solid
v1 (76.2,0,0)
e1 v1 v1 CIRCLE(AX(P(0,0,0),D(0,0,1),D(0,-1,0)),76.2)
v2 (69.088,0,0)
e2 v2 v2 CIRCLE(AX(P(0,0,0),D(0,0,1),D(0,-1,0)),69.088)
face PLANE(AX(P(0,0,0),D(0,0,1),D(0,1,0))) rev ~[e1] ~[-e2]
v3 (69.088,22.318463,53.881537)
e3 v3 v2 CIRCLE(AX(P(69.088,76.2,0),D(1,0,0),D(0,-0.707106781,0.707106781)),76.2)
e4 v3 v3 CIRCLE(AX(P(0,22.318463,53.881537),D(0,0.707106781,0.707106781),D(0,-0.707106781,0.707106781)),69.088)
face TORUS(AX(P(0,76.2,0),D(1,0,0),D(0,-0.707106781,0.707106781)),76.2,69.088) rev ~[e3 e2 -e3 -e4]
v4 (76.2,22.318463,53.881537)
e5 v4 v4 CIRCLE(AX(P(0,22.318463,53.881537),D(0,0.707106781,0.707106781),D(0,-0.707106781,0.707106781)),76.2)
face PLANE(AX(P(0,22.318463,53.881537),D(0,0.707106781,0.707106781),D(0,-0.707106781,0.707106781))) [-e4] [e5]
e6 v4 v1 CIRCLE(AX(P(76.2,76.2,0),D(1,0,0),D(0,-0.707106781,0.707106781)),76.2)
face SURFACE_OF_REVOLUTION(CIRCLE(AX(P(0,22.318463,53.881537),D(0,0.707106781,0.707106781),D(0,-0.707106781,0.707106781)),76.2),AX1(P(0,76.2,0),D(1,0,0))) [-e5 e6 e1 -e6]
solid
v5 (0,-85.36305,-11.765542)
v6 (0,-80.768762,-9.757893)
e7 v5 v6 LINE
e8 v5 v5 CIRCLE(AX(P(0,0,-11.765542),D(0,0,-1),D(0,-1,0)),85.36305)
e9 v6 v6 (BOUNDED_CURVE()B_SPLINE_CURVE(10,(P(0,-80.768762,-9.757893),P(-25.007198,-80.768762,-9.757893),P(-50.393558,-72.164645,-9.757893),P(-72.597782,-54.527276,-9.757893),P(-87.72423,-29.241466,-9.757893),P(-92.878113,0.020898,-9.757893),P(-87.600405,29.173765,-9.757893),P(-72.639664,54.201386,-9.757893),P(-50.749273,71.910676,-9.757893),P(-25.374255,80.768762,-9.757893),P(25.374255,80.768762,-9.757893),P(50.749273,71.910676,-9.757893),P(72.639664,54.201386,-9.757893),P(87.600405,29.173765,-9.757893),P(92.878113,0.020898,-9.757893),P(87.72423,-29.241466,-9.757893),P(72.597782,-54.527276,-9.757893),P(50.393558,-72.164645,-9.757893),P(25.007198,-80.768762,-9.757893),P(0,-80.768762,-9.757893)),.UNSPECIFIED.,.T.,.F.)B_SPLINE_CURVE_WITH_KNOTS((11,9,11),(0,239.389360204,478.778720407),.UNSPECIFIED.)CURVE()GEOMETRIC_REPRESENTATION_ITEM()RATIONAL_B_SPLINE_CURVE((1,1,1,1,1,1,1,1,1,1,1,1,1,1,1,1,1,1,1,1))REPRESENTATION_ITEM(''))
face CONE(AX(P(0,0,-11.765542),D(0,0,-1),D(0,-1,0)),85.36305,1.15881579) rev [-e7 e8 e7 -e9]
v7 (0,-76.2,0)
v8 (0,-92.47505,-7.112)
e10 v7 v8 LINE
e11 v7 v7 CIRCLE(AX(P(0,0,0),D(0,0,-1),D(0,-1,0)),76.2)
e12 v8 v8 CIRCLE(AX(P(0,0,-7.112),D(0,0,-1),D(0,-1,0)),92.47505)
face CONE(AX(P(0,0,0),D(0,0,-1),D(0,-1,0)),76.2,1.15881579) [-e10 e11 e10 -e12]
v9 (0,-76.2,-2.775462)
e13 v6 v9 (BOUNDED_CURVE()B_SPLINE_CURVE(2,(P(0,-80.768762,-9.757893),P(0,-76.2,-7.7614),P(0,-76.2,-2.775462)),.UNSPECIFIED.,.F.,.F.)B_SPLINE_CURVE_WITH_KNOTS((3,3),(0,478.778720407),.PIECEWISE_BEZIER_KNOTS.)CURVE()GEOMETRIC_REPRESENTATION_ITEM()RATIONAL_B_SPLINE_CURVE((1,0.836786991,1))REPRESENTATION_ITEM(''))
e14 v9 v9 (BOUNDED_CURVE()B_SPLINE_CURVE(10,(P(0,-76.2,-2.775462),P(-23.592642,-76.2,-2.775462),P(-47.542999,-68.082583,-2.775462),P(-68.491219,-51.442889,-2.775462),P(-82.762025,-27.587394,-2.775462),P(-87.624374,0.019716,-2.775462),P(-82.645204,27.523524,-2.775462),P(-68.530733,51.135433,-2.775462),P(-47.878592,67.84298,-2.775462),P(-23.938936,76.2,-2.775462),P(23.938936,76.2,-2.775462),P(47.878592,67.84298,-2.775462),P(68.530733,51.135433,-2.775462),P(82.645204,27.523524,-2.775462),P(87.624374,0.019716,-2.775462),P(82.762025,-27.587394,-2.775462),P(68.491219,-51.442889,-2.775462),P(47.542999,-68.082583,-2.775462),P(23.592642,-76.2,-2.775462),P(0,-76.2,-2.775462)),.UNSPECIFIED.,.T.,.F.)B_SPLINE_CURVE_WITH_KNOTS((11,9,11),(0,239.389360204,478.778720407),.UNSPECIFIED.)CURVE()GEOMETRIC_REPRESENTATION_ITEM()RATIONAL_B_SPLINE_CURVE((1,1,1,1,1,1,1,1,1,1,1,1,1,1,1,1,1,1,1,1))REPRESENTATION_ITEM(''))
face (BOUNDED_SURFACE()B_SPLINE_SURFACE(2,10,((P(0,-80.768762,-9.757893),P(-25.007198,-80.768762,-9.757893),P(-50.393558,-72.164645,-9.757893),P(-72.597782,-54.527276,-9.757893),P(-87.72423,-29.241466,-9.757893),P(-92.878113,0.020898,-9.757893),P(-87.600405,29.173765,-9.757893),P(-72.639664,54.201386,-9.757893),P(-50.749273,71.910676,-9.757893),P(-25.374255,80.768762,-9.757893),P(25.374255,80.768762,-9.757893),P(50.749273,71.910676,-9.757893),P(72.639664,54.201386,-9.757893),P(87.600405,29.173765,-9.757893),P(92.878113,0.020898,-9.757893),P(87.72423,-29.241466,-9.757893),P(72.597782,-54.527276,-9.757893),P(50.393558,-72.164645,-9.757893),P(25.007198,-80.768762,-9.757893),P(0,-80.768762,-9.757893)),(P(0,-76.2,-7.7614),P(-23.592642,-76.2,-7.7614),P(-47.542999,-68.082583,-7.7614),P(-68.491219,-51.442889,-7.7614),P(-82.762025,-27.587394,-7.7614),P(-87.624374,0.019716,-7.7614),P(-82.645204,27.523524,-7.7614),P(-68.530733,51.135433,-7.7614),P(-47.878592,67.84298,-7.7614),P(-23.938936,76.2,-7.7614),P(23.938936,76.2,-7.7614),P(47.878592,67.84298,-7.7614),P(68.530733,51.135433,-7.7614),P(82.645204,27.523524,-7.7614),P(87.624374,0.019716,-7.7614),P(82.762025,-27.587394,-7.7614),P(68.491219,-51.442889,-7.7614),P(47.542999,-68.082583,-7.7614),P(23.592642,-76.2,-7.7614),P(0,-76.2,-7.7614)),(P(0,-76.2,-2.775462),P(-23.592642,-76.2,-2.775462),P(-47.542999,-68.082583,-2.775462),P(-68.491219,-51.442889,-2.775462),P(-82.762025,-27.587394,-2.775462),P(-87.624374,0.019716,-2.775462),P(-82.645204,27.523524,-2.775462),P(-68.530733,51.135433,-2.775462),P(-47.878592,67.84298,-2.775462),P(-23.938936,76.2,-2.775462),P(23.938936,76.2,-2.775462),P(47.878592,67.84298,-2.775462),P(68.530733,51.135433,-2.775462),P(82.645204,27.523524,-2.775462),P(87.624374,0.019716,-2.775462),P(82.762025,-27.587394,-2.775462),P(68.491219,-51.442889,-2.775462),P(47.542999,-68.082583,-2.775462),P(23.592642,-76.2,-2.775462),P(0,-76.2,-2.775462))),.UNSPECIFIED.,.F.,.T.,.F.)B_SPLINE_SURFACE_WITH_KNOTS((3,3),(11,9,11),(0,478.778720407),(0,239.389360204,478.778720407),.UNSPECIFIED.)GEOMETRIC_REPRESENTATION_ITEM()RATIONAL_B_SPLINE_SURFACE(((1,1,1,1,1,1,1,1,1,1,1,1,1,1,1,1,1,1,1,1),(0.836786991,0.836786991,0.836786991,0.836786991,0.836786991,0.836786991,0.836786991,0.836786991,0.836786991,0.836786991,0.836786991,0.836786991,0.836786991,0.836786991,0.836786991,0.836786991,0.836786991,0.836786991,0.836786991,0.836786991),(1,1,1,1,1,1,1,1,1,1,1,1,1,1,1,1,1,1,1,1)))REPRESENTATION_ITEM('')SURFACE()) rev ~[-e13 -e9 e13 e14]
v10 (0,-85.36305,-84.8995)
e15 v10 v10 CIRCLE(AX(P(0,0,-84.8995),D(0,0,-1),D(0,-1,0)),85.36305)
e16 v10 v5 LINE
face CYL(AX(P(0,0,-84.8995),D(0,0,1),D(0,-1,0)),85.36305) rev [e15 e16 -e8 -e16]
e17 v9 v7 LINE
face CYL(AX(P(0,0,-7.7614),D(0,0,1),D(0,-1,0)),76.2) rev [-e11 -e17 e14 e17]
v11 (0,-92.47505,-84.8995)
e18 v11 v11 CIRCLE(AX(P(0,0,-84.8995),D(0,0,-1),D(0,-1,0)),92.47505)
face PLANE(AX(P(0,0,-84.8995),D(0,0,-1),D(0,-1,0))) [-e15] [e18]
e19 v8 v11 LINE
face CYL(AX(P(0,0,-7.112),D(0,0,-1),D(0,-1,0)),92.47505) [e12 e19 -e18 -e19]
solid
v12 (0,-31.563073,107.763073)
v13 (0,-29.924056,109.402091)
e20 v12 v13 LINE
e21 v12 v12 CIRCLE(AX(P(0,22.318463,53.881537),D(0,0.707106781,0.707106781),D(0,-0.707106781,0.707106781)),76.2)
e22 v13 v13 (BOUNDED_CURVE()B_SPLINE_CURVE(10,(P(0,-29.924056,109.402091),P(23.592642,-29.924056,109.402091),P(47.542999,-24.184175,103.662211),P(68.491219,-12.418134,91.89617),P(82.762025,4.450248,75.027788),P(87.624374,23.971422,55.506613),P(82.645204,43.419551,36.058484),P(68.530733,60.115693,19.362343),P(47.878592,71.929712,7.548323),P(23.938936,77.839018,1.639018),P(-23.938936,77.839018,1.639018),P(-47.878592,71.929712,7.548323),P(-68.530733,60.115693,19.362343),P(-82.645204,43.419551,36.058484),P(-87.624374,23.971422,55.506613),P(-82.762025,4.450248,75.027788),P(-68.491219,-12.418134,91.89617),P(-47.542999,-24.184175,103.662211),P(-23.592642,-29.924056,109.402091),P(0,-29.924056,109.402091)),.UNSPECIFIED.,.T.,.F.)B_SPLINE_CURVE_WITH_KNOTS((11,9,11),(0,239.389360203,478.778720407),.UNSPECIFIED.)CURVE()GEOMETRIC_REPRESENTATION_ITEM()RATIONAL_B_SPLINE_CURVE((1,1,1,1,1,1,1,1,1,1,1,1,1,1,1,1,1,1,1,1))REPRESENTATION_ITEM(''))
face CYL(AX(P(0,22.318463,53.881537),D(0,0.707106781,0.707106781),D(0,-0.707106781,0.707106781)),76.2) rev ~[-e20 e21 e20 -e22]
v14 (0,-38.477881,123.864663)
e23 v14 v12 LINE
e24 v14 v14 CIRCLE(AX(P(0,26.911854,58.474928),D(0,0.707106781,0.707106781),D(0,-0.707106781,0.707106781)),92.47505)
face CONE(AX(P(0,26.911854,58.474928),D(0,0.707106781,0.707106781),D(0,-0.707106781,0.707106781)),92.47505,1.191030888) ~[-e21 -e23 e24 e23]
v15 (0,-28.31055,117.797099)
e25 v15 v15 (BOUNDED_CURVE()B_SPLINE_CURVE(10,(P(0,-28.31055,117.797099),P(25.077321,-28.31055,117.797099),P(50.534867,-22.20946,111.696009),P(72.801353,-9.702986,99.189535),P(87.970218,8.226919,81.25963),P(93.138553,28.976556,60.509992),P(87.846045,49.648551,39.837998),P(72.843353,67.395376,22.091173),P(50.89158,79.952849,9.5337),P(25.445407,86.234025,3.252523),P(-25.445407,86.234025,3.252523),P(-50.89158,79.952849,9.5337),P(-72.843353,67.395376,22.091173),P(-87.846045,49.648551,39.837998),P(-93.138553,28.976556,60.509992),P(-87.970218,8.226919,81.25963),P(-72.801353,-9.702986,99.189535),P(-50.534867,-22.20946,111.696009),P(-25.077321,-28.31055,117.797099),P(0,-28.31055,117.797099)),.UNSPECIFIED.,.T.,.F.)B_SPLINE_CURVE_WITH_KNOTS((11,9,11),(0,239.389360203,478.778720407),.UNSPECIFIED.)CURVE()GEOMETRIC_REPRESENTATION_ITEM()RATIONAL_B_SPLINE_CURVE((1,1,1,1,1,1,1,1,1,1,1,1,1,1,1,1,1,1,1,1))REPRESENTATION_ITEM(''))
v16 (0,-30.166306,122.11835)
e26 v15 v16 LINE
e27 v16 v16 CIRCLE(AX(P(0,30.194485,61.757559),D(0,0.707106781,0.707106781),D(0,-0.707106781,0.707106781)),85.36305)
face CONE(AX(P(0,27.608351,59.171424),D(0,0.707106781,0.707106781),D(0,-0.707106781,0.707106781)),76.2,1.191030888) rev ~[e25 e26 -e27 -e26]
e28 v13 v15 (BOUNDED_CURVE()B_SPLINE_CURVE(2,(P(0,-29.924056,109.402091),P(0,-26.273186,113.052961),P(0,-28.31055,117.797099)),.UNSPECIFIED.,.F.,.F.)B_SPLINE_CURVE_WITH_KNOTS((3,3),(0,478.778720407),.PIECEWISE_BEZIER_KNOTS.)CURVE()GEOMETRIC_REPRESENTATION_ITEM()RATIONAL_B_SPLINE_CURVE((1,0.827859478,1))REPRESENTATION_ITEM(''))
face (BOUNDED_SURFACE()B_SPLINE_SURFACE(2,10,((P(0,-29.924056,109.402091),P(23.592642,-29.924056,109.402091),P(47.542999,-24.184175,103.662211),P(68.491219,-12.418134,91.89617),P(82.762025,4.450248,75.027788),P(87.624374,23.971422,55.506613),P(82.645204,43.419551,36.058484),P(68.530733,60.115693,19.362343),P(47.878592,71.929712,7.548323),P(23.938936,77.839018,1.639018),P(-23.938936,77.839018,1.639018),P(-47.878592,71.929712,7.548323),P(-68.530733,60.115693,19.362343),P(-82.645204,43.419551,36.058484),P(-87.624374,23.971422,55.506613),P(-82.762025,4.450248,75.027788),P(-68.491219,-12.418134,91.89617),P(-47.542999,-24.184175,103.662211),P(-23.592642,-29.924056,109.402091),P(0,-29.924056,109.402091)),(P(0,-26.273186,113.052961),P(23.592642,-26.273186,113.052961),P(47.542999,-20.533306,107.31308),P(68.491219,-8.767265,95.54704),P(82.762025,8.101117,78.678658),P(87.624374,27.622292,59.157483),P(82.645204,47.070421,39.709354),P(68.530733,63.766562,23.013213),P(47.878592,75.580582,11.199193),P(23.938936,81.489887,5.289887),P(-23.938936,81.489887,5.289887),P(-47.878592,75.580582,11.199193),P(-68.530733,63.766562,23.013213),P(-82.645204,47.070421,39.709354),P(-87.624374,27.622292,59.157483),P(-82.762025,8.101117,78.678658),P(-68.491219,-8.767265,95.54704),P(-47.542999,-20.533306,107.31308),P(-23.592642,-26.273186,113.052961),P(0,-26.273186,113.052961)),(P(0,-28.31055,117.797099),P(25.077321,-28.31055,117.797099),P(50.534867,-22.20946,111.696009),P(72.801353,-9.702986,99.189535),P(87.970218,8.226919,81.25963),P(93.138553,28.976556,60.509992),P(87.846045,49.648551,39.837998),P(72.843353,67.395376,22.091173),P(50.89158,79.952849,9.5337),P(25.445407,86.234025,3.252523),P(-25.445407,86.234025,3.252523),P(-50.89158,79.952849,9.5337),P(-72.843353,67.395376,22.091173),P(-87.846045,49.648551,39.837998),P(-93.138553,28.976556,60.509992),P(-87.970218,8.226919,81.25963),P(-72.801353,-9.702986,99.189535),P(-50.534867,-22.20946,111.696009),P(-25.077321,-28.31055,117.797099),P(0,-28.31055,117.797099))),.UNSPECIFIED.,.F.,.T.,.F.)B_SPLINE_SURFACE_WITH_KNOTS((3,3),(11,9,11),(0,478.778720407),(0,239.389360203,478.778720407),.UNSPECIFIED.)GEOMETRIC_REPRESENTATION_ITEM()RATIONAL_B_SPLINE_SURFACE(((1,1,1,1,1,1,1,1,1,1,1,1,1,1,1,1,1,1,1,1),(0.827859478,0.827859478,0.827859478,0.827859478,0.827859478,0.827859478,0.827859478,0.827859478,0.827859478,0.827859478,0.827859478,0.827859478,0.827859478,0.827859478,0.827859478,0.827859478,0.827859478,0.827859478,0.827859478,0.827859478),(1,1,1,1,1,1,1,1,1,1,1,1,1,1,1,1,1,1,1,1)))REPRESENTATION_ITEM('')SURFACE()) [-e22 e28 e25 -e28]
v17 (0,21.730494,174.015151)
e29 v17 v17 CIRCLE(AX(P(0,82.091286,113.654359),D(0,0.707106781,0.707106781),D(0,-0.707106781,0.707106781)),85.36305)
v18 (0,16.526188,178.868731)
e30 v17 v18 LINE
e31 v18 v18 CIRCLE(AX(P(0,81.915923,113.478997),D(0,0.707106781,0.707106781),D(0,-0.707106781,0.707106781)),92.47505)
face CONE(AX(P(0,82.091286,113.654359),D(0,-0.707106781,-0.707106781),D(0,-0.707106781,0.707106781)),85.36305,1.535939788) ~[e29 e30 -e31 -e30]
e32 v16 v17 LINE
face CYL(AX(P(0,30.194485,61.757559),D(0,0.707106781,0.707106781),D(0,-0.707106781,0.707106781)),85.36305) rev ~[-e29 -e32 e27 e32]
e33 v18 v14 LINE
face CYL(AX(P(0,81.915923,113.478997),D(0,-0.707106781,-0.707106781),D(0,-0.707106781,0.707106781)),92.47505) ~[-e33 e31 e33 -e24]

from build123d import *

# Parameters (mm, degrees)
F1_R   = 76.2
F1_R_2 = 69.088
F7_R   = 7.62
F8_R   = 7.62


with BuildPart() as f4:
    # F0 (on Right) → F4 (revolve)
    with BuildSketch(Plane.YZ):
        Polygon((-76.2, 0), (-92.47505, -7.112), (-92.47505, -84.8995), (-85.36305, -84.8995), (-85.36305, -11.7655417155), (-76.2, -7.7613996945), align=None)
    revolve(axis=Axis((0, 0, -46.00575), (0, 0, -1)))

    # F8
    f8_edges = [f4.edges().sort_by_distance(p)[0] for p in [
        (0, 76.2, -7.7614),
    ]]
    fillet(f8_edges, radius=F8_R)


with BuildPart() as f5:
    # F5: sweep along a path in F2
    with BuildLine(Plane.YZ) as f5_path:
        ThreePointArc((22.3184632736, 53.8815367264), (5.8003796226, 29.1604775462), (0, 0))
    # F1 (on Top) → F5 (sweep)
    with BuildSketch(Plane.XY):
        Circle(F1_R)
        Circle(F1_R_2, mode=Mode.SUBTRACT)
    sweep(path=f5_path.line)


with BuildPart() as f6:
    # F3 (on Right) → F6 (revolve)
    with BuildSketch(Plane.YZ):
        Polygon((16.5261881161, 178.8687314601), (-38.4778806255, 123.8646627185), (-31.5630734528, 107.7630734528), (-26.2731860569, 113.0529608487), (-30.1663061311, 122.1183503573), (21.7304941317, 174.0151506201), align=None)
    revolve(axis=Axis((0, 54.8494410722, 86.412514525), (0, 0.7071067812, 0.7071067812)))

    # F7
    f7_edges = [f6.edges().sort_by_distance(p)[0] for p in [
        (0, 81.489887, 5.289887),
    ]]
    fillet(f7_edges, radius=F7_R)


solid = Compound([f4.part, f5.part, f6.part])
